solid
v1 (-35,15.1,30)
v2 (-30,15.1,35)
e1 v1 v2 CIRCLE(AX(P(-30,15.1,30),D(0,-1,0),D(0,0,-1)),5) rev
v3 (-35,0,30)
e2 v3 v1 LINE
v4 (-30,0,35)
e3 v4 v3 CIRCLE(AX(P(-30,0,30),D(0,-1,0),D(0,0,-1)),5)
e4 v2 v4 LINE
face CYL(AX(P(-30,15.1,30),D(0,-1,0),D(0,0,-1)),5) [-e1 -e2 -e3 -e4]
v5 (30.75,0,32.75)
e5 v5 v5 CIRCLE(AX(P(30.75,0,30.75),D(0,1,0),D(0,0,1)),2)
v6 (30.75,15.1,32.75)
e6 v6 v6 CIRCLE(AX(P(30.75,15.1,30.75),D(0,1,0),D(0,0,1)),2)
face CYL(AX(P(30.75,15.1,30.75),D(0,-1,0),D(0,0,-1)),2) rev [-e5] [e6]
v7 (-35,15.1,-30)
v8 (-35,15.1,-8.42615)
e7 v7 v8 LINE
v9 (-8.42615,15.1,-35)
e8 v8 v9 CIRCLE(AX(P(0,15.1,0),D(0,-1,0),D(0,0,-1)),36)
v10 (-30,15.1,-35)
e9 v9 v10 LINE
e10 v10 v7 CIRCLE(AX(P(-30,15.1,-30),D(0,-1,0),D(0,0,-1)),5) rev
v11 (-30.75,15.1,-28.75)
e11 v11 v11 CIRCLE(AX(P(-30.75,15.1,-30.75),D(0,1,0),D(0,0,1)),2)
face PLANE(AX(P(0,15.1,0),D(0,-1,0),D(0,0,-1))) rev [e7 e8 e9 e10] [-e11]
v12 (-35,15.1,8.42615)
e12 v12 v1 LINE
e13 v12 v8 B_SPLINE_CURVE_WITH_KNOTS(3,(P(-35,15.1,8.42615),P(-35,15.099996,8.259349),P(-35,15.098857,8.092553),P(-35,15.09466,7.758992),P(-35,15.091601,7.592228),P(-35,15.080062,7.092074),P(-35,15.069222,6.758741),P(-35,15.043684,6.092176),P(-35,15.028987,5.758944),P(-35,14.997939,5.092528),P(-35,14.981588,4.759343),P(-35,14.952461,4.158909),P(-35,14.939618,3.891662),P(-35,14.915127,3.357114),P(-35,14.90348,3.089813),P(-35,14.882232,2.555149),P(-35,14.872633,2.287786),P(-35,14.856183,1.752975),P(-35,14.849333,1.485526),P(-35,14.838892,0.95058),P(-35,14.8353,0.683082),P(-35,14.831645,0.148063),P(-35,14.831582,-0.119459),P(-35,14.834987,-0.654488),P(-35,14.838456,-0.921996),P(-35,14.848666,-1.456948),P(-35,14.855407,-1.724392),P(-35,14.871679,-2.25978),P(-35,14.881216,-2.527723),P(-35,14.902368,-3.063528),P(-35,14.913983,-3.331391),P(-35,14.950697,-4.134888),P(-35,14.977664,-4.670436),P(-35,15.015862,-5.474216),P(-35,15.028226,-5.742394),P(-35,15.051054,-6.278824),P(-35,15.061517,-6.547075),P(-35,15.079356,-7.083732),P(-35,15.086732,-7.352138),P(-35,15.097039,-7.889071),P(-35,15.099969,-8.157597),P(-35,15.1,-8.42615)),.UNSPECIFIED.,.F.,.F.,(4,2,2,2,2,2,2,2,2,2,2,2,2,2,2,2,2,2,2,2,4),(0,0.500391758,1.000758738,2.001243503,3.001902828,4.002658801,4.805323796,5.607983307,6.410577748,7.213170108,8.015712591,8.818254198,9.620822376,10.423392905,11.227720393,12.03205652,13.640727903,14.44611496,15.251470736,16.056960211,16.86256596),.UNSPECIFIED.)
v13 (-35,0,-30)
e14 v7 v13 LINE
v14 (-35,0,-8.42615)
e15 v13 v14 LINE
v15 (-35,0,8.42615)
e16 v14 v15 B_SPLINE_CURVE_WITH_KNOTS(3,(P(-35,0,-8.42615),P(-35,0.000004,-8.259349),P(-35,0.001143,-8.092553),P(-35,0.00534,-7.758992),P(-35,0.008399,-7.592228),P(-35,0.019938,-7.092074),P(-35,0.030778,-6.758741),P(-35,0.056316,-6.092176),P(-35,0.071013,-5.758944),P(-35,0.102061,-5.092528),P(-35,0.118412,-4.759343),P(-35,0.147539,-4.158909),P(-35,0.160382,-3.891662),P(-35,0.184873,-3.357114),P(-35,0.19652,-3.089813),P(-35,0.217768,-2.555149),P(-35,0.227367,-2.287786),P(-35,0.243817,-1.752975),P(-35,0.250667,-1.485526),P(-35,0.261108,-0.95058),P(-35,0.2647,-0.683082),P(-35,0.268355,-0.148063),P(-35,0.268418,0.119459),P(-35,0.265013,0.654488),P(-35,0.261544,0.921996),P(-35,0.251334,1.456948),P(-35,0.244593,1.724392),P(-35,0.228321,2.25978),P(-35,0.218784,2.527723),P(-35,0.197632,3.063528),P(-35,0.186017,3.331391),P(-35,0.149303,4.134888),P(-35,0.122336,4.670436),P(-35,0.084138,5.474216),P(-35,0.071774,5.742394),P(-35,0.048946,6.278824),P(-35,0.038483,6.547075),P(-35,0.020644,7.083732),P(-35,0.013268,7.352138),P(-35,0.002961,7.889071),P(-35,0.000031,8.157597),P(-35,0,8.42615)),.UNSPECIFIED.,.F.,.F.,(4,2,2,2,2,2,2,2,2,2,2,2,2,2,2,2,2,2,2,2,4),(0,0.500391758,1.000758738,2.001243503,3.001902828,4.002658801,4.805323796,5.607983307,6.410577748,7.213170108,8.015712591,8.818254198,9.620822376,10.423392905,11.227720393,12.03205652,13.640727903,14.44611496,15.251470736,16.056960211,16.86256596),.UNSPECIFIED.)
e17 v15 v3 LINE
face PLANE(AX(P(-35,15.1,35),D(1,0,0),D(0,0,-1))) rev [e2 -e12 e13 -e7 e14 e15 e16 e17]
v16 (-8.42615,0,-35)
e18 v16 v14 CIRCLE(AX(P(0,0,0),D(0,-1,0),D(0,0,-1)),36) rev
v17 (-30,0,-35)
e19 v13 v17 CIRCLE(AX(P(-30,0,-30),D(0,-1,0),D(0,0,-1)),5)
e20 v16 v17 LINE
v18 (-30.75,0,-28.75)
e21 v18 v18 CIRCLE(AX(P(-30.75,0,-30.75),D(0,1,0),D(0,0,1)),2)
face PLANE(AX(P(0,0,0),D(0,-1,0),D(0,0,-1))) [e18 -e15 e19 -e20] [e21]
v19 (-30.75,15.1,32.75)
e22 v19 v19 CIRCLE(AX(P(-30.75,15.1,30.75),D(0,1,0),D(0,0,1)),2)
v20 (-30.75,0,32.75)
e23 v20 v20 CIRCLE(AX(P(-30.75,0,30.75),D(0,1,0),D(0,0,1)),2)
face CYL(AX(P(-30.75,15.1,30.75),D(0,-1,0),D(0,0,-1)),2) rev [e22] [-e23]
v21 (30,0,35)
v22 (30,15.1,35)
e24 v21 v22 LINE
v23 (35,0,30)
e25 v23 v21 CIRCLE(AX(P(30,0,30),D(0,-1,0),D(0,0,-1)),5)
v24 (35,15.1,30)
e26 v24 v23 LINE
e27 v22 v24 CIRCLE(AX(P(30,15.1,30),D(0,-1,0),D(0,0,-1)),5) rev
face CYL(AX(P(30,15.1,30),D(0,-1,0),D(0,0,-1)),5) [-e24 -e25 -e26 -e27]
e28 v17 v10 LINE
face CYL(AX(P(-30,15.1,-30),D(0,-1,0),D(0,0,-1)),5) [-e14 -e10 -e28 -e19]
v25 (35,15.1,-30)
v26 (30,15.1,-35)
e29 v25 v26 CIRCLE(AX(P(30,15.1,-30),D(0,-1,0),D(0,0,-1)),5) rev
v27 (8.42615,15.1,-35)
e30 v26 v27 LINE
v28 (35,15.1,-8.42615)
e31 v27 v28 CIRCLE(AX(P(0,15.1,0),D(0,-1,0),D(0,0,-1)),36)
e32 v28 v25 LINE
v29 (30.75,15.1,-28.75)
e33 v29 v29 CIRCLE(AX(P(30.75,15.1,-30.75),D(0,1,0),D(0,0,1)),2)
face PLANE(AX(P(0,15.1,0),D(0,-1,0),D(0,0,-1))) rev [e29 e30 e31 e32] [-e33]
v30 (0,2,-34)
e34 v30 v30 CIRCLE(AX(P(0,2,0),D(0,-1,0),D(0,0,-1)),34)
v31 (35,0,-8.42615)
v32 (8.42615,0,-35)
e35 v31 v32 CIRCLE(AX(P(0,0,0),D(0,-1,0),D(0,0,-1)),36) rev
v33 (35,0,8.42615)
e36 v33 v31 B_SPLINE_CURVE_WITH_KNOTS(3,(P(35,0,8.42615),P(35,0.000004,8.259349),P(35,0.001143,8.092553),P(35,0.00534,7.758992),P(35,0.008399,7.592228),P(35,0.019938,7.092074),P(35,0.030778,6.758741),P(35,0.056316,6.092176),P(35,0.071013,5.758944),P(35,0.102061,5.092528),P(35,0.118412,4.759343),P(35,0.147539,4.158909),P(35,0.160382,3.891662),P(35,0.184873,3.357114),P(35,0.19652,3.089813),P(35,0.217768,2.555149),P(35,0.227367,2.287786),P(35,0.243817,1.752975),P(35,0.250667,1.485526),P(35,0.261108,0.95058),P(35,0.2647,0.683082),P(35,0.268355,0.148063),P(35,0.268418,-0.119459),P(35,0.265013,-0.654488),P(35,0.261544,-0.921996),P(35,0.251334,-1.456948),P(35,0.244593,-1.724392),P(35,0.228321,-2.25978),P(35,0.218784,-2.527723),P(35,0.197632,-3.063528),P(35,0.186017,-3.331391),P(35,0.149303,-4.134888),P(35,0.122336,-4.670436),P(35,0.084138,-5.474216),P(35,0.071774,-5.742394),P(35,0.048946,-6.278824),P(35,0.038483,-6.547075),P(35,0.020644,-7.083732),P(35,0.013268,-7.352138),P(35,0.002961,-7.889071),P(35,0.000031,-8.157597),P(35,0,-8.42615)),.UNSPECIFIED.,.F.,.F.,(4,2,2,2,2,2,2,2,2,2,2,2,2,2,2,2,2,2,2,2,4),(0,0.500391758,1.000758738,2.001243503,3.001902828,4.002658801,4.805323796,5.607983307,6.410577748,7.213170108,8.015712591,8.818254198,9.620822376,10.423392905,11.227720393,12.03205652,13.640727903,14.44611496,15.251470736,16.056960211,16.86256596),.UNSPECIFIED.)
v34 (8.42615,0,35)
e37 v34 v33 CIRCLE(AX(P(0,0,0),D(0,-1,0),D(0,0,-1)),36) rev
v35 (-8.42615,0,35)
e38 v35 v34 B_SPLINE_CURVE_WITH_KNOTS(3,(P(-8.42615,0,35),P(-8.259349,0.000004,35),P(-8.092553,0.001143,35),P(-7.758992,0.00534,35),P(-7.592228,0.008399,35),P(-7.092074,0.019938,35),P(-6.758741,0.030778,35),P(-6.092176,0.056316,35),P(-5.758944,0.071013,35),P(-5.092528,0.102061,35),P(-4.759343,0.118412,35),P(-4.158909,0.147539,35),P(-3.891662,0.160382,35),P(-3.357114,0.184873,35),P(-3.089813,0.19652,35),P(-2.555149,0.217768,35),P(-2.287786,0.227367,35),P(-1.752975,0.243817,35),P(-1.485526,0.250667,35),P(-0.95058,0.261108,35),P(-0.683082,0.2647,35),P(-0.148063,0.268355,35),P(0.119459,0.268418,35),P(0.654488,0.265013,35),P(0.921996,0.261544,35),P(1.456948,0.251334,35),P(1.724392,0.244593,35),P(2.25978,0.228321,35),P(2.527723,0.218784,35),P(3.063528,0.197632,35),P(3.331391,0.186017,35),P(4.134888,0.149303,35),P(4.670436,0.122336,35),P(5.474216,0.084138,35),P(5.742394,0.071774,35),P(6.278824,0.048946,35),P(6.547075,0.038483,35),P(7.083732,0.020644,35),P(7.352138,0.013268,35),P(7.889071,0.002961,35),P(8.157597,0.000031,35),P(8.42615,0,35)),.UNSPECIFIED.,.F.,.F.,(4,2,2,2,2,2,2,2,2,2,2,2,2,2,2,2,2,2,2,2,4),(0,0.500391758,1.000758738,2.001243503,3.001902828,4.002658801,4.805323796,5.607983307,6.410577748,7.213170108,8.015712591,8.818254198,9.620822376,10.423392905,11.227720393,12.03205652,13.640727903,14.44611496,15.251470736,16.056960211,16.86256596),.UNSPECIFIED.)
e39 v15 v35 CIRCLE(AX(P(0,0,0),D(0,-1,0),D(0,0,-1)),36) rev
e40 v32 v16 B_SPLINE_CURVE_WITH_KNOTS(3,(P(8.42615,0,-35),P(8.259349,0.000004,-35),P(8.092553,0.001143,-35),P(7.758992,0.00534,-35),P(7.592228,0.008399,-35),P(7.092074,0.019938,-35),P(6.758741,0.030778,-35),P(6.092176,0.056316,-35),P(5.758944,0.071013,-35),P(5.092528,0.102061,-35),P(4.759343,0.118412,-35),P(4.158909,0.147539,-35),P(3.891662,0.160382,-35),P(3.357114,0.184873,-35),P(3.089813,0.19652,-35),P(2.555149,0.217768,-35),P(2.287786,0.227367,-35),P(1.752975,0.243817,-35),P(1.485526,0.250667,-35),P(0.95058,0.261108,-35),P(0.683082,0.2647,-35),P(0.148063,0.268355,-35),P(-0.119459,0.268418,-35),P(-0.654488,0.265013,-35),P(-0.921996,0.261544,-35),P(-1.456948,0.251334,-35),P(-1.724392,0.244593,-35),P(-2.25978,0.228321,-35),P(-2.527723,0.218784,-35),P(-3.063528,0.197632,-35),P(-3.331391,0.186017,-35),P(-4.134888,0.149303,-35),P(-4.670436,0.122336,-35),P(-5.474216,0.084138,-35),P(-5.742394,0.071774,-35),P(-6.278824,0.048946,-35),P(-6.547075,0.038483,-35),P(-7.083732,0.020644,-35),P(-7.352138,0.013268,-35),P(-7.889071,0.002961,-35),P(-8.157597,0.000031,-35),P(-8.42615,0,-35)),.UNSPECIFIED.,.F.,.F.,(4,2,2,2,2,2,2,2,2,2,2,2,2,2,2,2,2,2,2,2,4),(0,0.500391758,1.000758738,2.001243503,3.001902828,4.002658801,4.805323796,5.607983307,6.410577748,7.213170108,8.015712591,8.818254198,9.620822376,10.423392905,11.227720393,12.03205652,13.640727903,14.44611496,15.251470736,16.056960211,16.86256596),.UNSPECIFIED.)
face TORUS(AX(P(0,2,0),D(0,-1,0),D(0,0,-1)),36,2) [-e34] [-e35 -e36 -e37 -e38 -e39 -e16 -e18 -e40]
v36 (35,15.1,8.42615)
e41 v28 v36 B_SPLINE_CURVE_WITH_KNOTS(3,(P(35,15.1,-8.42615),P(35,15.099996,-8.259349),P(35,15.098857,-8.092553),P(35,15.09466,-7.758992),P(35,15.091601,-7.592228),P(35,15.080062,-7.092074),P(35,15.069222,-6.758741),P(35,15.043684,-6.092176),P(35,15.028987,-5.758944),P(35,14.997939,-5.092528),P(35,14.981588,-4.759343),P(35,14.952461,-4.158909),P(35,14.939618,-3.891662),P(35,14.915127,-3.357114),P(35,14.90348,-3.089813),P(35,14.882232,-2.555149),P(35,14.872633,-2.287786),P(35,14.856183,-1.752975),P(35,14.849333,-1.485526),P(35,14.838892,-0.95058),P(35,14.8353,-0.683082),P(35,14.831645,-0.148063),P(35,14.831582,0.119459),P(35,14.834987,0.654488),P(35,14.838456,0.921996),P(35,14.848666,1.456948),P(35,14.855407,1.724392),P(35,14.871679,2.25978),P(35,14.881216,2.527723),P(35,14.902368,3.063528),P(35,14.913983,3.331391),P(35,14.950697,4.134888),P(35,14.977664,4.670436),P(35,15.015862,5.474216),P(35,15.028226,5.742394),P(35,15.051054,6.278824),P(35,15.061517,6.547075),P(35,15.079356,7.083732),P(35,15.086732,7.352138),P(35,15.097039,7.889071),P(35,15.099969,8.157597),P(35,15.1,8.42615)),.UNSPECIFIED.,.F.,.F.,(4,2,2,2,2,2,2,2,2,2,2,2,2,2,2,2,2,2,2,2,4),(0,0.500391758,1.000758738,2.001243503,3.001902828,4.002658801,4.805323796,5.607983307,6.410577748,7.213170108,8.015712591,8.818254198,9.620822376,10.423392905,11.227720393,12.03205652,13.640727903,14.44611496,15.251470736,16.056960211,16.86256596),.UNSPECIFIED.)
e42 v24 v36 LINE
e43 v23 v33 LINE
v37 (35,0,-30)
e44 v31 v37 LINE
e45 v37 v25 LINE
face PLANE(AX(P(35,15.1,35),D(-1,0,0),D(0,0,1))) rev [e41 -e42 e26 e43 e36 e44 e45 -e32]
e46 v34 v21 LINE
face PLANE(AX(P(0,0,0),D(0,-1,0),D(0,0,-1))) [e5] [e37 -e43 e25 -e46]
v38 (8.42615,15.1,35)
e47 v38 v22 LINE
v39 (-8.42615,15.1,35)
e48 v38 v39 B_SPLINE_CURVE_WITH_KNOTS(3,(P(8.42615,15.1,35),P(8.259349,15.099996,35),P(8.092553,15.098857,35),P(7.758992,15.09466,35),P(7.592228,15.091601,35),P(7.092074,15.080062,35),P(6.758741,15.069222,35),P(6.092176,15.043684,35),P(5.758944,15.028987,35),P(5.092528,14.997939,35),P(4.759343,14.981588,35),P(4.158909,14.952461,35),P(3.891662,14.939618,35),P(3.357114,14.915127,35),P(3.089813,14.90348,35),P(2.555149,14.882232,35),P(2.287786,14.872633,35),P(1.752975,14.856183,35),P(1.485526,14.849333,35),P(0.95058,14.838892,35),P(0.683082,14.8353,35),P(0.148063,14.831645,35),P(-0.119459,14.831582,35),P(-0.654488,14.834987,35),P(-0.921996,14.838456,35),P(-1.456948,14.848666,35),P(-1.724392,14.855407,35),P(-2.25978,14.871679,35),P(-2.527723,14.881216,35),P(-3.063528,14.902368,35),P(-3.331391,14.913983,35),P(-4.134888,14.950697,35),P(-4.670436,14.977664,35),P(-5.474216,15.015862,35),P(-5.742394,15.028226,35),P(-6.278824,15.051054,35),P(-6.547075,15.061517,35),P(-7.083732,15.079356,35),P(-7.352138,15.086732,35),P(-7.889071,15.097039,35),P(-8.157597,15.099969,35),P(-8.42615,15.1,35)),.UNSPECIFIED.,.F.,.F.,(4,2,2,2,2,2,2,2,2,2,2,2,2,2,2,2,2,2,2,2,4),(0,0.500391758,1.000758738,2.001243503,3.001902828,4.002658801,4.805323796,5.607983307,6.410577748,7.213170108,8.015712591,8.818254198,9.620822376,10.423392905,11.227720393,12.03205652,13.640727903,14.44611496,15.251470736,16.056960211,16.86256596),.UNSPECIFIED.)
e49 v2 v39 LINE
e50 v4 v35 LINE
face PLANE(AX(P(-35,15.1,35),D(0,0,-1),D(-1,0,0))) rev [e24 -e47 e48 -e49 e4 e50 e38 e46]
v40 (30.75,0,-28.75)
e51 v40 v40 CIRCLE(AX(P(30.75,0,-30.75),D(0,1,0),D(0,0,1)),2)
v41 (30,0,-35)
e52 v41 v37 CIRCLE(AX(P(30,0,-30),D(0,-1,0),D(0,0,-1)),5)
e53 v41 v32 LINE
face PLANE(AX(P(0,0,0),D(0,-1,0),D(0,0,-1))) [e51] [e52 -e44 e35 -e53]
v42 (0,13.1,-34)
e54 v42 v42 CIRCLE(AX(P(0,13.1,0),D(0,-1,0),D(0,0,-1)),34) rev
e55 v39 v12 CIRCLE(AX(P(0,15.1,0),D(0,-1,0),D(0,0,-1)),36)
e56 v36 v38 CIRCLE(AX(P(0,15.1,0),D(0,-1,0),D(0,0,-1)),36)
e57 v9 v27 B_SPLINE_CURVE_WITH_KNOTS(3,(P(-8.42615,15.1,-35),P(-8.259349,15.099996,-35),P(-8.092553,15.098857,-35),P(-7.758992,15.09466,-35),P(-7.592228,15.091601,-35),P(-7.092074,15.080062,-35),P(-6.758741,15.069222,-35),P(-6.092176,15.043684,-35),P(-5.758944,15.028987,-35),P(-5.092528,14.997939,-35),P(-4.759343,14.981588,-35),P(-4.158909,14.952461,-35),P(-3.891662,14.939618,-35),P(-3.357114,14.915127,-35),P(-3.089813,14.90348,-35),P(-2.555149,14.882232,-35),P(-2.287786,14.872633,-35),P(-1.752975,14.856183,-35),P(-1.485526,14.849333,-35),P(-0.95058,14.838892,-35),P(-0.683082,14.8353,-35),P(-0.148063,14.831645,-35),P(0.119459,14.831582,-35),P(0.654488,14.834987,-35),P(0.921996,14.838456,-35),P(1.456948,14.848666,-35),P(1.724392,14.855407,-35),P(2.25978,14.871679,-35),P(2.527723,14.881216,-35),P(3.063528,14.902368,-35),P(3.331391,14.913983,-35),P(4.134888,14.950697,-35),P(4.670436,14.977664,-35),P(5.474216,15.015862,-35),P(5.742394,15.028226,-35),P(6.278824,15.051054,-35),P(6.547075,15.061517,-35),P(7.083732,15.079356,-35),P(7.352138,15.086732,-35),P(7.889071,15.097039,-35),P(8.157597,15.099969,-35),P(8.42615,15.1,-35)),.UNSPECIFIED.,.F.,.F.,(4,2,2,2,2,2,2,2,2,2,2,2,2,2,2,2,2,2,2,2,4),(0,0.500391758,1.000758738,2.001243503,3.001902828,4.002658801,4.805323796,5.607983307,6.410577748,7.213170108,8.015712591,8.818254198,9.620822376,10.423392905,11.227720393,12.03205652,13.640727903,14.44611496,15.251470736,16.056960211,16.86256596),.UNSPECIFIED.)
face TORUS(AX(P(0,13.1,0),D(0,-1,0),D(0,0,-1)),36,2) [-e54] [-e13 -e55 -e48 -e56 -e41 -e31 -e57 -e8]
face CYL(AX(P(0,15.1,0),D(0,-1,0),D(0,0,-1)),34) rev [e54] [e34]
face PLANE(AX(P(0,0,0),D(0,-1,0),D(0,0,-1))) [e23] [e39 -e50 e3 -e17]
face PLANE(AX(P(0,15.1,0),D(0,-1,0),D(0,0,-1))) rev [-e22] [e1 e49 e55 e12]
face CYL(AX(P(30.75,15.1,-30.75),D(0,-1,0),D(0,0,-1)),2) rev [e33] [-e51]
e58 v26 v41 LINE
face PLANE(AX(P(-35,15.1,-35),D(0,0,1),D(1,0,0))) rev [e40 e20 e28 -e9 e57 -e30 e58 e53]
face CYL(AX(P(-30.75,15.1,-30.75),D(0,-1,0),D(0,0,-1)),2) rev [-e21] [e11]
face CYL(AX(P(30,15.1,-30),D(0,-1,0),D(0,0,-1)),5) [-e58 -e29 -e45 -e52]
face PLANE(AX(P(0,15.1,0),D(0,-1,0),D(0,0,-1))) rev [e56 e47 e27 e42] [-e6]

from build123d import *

# Parameters (mm, degrees)
SKETCH_1_W      = 70
SKETCH_1_H      = 70
SKETCH_1_R      = 2
SKETCH_1_R_2    = 34
EXTRUDE_1_DEPTH = 15.1
FILLET_1_R      = 5
FILLET_2_R      = 2


with BuildPart() as part:
    # Эскиз1 → Бобышка-Вытянуть1 (new body)
    with BuildSketch(Plane(origin=(0, 0, 0), x_dir=(1, 0, 0), z_dir=(0, 1, 0))):
        Rectangle(SKETCH_1_W, SKETCH_1_H)
        with Locations(Location((30.75, 30.75, 0), (0, 0, 270))):
            Circle(SKETCH_1_R, mode=Mode.SUBTRACT)
        with Locations(Location((0, 0, 0), (0, 0, 270))):
            Circle(SKETCH_1_R_2, mode=Mode.SUBTRACT)
        with Locations(Location((30.75, -30.75, 0), (0, 0, 270))):
            Circle(SKETCH_1_R, mode=Mode.SUBTRACT)
        with Locations(Location((-30.75, -30.75, 0), (0, 0, 270))):
            Circle(SKETCH_1_R, mode=Mode.SUBTRACT)
        with Locations(Location((-30.75, 30.75, 0), (0, 0, 270))):
            Circle(SKETCH_1_R, mode=Mode.SUBTRACT)
    extrude(amount=EXTRUDE_1_DEPTH)

    # Скругление1
    fillet_1_edges = [part.edges().sort_by_distance(p)[0] for p in [
        (35, 7.55, 35),
        (-35, 7.55, 35),
        (-35, 7.55, -35),
        (35, 7.55, -35),
    ]]
    fillet(fillet_1_edges, radius=FILLET_1_R)

    # Скругление2
    # the kernel refuses this fillet: 2 mm, written as the material it takes off along each edge
    with BuildSketch(Plane(origin=(0, 0, 0), x_dir=(0, 0, 1), z_dir=(-1, 0, 0))) as fillet_2_piece_1:
        with BuildLine():
            CenterArc((34 + FILLET_2_R, FILLET_2_R), FILLET_2_R, 180, 90)
            Line((34, FILLET_2_R), (34, 0))
            Line((34, 0), (34 + FILLET_2_R, 0))
        make_face()
    revolve(axis=Axis((0, 0, 0), (0, 1, 0)), mode=Mode.SUBTRACT)
    with BuildSketch(Plane(origin=(0, 15.1, 0), x_dir=(0, 0, 1), z_dir=(-1, 0, 0))) as fillet_2_piece_2:
        with BuildLine():
            CenterArc((34 + FILLET_2_R, -FILLET_2_R), FILLET_2_R, 90, 90)
            Line((34, -FILLET_2_R), (34, 0))
            Line((34, 0), (34 + FILLET_2_R, 0))
        make_face()
    revolve(axis=Axis((0, 15.1, 0), (0, 1, 0)), mode=Mode.SUBTRACT)


solid = part.part
